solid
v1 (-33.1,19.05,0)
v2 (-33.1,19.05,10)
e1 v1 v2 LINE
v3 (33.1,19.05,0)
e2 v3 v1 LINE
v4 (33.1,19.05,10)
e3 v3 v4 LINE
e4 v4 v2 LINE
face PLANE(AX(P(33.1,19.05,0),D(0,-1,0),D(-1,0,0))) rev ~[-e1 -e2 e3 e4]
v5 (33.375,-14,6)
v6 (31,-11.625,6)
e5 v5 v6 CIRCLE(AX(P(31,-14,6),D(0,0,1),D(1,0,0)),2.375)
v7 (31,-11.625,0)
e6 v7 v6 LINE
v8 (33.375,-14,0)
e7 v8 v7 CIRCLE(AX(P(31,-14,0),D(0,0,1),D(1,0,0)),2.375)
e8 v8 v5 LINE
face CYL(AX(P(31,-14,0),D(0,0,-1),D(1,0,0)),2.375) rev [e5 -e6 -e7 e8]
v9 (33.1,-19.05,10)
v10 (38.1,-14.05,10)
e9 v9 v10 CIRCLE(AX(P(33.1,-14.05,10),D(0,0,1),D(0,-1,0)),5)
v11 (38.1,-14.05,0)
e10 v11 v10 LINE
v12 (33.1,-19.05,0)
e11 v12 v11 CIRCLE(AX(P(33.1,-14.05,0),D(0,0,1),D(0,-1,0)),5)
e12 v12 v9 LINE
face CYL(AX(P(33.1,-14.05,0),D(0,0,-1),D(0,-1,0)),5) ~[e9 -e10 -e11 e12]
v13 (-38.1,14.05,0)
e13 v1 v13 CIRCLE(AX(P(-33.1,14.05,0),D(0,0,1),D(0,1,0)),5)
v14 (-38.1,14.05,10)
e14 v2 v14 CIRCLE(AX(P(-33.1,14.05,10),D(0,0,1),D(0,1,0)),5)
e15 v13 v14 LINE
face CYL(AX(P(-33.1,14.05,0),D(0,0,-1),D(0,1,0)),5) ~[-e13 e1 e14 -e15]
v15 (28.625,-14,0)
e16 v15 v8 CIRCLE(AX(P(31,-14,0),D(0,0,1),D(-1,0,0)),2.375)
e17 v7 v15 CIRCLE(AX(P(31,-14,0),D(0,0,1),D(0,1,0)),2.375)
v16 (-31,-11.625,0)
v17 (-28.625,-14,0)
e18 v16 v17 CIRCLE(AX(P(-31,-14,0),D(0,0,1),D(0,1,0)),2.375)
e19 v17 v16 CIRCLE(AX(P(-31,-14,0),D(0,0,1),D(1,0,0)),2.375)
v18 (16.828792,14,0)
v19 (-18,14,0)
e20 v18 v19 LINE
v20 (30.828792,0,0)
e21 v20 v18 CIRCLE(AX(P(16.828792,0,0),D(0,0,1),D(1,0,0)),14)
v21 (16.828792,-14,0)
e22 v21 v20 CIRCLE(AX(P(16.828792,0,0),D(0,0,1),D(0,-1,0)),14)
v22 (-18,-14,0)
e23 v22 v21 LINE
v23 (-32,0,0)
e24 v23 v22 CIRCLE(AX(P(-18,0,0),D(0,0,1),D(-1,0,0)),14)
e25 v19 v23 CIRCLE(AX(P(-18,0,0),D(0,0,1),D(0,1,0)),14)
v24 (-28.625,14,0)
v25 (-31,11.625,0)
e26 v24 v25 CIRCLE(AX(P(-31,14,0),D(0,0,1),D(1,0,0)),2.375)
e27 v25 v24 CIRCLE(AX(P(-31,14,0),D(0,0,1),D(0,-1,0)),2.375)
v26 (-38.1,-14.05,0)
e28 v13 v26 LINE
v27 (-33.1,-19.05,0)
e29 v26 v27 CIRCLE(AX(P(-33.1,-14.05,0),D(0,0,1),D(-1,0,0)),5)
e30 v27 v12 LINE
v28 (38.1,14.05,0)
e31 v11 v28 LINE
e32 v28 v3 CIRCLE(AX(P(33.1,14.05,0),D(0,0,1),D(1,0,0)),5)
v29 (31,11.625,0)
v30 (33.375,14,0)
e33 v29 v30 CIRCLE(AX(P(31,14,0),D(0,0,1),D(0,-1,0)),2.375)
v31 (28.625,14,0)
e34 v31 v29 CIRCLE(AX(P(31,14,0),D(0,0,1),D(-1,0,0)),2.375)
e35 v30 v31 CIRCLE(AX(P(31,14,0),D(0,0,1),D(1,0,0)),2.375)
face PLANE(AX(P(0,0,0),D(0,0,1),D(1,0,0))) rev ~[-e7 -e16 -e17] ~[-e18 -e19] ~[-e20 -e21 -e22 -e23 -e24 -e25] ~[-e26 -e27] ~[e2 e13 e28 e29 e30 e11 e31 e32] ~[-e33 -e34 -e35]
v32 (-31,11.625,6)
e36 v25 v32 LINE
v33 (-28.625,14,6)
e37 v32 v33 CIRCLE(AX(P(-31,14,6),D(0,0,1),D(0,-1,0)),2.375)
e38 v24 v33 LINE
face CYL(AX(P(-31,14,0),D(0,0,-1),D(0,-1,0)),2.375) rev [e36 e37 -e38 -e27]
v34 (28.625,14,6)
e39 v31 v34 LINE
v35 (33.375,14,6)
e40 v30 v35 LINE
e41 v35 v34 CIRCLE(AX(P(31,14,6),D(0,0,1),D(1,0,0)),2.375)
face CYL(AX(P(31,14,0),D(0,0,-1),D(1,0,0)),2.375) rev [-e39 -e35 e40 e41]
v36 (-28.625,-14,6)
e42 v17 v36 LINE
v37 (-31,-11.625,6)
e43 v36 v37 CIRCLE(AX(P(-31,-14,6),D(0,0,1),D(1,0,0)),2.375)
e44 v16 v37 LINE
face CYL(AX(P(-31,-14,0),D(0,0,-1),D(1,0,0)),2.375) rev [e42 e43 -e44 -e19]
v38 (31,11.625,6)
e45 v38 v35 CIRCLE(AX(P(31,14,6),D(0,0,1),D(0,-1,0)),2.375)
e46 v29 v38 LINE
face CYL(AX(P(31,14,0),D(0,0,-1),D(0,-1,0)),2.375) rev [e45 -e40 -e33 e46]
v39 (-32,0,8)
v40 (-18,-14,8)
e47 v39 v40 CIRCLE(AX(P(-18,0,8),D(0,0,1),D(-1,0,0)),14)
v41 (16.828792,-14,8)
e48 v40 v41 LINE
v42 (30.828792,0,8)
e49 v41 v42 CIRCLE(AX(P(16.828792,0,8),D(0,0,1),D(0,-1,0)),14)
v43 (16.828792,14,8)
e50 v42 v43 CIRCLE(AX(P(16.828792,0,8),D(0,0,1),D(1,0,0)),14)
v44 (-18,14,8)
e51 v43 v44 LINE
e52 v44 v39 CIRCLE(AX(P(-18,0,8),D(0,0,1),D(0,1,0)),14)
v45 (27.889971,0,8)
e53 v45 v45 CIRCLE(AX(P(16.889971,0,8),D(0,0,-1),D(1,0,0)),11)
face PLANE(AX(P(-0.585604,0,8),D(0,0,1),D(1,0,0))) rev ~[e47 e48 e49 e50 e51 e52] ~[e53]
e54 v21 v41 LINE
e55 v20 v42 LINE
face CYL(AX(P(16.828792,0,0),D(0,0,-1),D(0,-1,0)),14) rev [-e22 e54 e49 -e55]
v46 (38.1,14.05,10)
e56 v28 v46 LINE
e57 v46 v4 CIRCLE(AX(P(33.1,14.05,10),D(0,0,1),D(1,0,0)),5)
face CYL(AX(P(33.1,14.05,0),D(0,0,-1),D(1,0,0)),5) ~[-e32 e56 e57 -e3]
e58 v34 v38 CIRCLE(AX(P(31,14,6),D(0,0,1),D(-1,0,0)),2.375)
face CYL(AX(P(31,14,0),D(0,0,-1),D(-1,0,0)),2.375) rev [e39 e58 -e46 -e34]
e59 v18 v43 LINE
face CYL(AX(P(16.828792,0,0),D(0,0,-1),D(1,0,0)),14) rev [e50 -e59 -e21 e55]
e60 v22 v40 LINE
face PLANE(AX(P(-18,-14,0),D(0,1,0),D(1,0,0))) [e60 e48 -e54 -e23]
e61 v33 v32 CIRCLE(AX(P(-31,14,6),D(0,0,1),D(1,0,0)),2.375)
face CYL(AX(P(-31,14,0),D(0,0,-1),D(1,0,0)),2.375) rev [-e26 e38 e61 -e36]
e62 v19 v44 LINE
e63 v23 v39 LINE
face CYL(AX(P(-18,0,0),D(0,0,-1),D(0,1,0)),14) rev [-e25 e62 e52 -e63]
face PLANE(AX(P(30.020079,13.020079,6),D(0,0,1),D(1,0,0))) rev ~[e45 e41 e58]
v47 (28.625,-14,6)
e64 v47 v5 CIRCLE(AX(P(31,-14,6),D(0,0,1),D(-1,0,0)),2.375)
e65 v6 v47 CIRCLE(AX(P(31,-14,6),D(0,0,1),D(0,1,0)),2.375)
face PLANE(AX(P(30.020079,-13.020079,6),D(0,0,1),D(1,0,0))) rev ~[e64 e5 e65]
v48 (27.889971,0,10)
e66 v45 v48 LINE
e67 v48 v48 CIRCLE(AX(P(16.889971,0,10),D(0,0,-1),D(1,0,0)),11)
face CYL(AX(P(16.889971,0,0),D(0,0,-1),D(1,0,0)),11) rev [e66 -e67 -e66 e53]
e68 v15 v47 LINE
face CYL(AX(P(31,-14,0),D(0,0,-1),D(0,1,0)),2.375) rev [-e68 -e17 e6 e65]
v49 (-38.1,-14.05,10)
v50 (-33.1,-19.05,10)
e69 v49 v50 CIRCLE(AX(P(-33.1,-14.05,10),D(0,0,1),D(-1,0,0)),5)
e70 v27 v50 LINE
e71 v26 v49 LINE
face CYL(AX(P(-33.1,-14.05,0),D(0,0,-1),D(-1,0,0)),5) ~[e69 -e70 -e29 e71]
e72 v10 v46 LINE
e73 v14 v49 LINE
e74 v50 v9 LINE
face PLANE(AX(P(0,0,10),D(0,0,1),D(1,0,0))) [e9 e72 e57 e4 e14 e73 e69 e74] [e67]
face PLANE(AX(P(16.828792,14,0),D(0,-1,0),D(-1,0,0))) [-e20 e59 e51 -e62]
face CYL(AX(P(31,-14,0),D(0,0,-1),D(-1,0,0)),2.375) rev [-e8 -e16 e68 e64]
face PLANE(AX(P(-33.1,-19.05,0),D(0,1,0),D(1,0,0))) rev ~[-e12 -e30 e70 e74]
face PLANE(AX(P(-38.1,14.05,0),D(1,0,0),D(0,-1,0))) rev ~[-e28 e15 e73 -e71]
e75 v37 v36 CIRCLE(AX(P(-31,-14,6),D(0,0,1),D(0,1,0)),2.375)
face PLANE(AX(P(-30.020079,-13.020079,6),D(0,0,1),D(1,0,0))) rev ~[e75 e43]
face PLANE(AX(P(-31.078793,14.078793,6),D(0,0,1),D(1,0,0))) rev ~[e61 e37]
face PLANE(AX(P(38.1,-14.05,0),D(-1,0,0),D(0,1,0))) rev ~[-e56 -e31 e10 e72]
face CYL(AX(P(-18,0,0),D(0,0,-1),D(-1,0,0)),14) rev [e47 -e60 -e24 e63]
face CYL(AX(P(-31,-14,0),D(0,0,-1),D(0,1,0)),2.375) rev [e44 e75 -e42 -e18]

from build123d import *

# Parameters (mm, degrees)
F1_DEPTH = 10
F2_R     = 11
F3_DEPTH = 20
F5_DEPTH = 6
F7_DEPTH = 8


# Not quite as in the source:
# - a feature names something its author has since deleted; it is built from what else it names


with BuildPart() as f1:
    # F0 (on Top) → F1 (new body)
    with BuildSketch(Plane.XY):
        with BuildLine():
            Line((33.1, 19.05), (-33.1, 19.05))
            ThreePointArc((-33.1, 19.05), (-36.6355339059, 17.5855339059), (-38.1, 14.05))
            Line((-38.1, 14.05), (-38.1, -14.05))
            ThreePointArc((-38.1, -14.05), (-36.6355339059, -17.5855339059), (-33.1, -19.05))
            Line((-33.1, -19.05), (33.1, -19.05))
            ThreePointArc((33.1, -19.05), (36.6355339059, -17.5855339059), (38.1, -14.05))
            Line((38.1, -14.05), (38.1, 14.05))
            ThreePointArc((38.1, 14.05), (36.6355339059, 17.5855339059), (33.1, 19.05))
        make_face()
    extrude(amount=F1_DEPTH)

    # F2 (on Top) → F3 (cut)
    with BuildSketch(Plane.XY):
        with Locations((16.8899707496, 0)):
            Circle(F2_R)
    extrude(amount=F3_DEPTH, mode=Mode.SUBTRACT)

    # F4 (on Top) → F5 (cut)
    with BuildSketch(Plane.XY):
        with BuildLine():
            Line((31, -14), (31, -11.625))
            ThreePointArc((31, -11.625), (29.3206213947, -12.3206213947), (28.625, -14))
            Line((28.625, -14), (31, -14))
        make_face()
        with BuildLine():
            ThreePointArc((33.375, -14), (32.6793786053, -12.3206213947), (31, -11.625))
            Line((31, -11.625), (31, -14))
            Line((31, -14), (28.625, -14))
            ThreePointArc((28.625, -14), (31, -16.375), (33.375, -14))
        make_face()
        with BuildLine():
            ThreePointArc((-28.625, -14), (-29.3206213947, -12.3206213947), (-31, -11.625))
            Line((-31, -11.625), (-31, -14))
            Line((-31, -14), (-28.625, -14))
        make_face()
        with BuildLine():
            Line((-31, -14), (-31, -11.625))
            ThreePointArc((-31, -11.625), (-32.6793786053, -15.6793786053), (-28.625, -14))
            Line((-28.625, -14), (-31, -14))
        make_face()
        with BuildLine():
            Line((-31, 14), (-28.625, 14))
            ThreePointArc((-28.625, 14), (-32.6793786053, 15.6793786053), (-31, 11.625))
            Line((-31, 11.625), (-31, 14))
        make_face()
        with BuildLine():
            ThreePointArc((-31, 11.625), (-29.3206213947, 12.3206213947), (-28.625, 14))
            Line((-28.625, 14), (-31, 14))
            Line((-31, 14), (-31, 11.625))
        make_face()
        with BuildLine():
            Line((31, 14), (28.625, 14))
            ThreePointArc((28.625, 14), (29.3206213947, 12.3206213947), (31, 11.625))
            Line((31, 11.625), (31, 14))
        make_face()
        with BuildLine():
            ThreePointArc((33.375, 14), (31, 16.375), (28.625, 14))
            Line((28.625, 14), (31, 14))
            Line((31, 14), (31, 11.625))
            ThreePointArc((31, 11.625), (32.6793786053, 12.3206213947), (33.375, 14))
        make_face()
    extrude(amount=F5_DEPTH, mode=Mode.SUBTRACT)

    # F6 (on Top) → F7 (cut)
    with BuildSketch(Plane.XY):
        with BuildLine():
            Line((16.8287921697, 14), (-18, 14))
            ThreePointArc((-18, 14), (-27.8994949366, 9.8994949366), (-32, 0))
            ThreePointArc((-32, 0), (-27.8994949366, -9.8994949366), (-18, -14))
            Line((-18, -14), (16.8287921697, -14))
            ThreePointArc((16.8287921697, -14), (26.7282871063, -9.8994949366), (30.8287921697, 0))
            ThreePointArc((30.8287921697, 0), (26.7282871063, 9.8994949366), (16.8287921697, 14))
        make_face()
    extrude(amount=F7_DEPTH, mode=Mode.SUBTRACT)


solid = f1.part
